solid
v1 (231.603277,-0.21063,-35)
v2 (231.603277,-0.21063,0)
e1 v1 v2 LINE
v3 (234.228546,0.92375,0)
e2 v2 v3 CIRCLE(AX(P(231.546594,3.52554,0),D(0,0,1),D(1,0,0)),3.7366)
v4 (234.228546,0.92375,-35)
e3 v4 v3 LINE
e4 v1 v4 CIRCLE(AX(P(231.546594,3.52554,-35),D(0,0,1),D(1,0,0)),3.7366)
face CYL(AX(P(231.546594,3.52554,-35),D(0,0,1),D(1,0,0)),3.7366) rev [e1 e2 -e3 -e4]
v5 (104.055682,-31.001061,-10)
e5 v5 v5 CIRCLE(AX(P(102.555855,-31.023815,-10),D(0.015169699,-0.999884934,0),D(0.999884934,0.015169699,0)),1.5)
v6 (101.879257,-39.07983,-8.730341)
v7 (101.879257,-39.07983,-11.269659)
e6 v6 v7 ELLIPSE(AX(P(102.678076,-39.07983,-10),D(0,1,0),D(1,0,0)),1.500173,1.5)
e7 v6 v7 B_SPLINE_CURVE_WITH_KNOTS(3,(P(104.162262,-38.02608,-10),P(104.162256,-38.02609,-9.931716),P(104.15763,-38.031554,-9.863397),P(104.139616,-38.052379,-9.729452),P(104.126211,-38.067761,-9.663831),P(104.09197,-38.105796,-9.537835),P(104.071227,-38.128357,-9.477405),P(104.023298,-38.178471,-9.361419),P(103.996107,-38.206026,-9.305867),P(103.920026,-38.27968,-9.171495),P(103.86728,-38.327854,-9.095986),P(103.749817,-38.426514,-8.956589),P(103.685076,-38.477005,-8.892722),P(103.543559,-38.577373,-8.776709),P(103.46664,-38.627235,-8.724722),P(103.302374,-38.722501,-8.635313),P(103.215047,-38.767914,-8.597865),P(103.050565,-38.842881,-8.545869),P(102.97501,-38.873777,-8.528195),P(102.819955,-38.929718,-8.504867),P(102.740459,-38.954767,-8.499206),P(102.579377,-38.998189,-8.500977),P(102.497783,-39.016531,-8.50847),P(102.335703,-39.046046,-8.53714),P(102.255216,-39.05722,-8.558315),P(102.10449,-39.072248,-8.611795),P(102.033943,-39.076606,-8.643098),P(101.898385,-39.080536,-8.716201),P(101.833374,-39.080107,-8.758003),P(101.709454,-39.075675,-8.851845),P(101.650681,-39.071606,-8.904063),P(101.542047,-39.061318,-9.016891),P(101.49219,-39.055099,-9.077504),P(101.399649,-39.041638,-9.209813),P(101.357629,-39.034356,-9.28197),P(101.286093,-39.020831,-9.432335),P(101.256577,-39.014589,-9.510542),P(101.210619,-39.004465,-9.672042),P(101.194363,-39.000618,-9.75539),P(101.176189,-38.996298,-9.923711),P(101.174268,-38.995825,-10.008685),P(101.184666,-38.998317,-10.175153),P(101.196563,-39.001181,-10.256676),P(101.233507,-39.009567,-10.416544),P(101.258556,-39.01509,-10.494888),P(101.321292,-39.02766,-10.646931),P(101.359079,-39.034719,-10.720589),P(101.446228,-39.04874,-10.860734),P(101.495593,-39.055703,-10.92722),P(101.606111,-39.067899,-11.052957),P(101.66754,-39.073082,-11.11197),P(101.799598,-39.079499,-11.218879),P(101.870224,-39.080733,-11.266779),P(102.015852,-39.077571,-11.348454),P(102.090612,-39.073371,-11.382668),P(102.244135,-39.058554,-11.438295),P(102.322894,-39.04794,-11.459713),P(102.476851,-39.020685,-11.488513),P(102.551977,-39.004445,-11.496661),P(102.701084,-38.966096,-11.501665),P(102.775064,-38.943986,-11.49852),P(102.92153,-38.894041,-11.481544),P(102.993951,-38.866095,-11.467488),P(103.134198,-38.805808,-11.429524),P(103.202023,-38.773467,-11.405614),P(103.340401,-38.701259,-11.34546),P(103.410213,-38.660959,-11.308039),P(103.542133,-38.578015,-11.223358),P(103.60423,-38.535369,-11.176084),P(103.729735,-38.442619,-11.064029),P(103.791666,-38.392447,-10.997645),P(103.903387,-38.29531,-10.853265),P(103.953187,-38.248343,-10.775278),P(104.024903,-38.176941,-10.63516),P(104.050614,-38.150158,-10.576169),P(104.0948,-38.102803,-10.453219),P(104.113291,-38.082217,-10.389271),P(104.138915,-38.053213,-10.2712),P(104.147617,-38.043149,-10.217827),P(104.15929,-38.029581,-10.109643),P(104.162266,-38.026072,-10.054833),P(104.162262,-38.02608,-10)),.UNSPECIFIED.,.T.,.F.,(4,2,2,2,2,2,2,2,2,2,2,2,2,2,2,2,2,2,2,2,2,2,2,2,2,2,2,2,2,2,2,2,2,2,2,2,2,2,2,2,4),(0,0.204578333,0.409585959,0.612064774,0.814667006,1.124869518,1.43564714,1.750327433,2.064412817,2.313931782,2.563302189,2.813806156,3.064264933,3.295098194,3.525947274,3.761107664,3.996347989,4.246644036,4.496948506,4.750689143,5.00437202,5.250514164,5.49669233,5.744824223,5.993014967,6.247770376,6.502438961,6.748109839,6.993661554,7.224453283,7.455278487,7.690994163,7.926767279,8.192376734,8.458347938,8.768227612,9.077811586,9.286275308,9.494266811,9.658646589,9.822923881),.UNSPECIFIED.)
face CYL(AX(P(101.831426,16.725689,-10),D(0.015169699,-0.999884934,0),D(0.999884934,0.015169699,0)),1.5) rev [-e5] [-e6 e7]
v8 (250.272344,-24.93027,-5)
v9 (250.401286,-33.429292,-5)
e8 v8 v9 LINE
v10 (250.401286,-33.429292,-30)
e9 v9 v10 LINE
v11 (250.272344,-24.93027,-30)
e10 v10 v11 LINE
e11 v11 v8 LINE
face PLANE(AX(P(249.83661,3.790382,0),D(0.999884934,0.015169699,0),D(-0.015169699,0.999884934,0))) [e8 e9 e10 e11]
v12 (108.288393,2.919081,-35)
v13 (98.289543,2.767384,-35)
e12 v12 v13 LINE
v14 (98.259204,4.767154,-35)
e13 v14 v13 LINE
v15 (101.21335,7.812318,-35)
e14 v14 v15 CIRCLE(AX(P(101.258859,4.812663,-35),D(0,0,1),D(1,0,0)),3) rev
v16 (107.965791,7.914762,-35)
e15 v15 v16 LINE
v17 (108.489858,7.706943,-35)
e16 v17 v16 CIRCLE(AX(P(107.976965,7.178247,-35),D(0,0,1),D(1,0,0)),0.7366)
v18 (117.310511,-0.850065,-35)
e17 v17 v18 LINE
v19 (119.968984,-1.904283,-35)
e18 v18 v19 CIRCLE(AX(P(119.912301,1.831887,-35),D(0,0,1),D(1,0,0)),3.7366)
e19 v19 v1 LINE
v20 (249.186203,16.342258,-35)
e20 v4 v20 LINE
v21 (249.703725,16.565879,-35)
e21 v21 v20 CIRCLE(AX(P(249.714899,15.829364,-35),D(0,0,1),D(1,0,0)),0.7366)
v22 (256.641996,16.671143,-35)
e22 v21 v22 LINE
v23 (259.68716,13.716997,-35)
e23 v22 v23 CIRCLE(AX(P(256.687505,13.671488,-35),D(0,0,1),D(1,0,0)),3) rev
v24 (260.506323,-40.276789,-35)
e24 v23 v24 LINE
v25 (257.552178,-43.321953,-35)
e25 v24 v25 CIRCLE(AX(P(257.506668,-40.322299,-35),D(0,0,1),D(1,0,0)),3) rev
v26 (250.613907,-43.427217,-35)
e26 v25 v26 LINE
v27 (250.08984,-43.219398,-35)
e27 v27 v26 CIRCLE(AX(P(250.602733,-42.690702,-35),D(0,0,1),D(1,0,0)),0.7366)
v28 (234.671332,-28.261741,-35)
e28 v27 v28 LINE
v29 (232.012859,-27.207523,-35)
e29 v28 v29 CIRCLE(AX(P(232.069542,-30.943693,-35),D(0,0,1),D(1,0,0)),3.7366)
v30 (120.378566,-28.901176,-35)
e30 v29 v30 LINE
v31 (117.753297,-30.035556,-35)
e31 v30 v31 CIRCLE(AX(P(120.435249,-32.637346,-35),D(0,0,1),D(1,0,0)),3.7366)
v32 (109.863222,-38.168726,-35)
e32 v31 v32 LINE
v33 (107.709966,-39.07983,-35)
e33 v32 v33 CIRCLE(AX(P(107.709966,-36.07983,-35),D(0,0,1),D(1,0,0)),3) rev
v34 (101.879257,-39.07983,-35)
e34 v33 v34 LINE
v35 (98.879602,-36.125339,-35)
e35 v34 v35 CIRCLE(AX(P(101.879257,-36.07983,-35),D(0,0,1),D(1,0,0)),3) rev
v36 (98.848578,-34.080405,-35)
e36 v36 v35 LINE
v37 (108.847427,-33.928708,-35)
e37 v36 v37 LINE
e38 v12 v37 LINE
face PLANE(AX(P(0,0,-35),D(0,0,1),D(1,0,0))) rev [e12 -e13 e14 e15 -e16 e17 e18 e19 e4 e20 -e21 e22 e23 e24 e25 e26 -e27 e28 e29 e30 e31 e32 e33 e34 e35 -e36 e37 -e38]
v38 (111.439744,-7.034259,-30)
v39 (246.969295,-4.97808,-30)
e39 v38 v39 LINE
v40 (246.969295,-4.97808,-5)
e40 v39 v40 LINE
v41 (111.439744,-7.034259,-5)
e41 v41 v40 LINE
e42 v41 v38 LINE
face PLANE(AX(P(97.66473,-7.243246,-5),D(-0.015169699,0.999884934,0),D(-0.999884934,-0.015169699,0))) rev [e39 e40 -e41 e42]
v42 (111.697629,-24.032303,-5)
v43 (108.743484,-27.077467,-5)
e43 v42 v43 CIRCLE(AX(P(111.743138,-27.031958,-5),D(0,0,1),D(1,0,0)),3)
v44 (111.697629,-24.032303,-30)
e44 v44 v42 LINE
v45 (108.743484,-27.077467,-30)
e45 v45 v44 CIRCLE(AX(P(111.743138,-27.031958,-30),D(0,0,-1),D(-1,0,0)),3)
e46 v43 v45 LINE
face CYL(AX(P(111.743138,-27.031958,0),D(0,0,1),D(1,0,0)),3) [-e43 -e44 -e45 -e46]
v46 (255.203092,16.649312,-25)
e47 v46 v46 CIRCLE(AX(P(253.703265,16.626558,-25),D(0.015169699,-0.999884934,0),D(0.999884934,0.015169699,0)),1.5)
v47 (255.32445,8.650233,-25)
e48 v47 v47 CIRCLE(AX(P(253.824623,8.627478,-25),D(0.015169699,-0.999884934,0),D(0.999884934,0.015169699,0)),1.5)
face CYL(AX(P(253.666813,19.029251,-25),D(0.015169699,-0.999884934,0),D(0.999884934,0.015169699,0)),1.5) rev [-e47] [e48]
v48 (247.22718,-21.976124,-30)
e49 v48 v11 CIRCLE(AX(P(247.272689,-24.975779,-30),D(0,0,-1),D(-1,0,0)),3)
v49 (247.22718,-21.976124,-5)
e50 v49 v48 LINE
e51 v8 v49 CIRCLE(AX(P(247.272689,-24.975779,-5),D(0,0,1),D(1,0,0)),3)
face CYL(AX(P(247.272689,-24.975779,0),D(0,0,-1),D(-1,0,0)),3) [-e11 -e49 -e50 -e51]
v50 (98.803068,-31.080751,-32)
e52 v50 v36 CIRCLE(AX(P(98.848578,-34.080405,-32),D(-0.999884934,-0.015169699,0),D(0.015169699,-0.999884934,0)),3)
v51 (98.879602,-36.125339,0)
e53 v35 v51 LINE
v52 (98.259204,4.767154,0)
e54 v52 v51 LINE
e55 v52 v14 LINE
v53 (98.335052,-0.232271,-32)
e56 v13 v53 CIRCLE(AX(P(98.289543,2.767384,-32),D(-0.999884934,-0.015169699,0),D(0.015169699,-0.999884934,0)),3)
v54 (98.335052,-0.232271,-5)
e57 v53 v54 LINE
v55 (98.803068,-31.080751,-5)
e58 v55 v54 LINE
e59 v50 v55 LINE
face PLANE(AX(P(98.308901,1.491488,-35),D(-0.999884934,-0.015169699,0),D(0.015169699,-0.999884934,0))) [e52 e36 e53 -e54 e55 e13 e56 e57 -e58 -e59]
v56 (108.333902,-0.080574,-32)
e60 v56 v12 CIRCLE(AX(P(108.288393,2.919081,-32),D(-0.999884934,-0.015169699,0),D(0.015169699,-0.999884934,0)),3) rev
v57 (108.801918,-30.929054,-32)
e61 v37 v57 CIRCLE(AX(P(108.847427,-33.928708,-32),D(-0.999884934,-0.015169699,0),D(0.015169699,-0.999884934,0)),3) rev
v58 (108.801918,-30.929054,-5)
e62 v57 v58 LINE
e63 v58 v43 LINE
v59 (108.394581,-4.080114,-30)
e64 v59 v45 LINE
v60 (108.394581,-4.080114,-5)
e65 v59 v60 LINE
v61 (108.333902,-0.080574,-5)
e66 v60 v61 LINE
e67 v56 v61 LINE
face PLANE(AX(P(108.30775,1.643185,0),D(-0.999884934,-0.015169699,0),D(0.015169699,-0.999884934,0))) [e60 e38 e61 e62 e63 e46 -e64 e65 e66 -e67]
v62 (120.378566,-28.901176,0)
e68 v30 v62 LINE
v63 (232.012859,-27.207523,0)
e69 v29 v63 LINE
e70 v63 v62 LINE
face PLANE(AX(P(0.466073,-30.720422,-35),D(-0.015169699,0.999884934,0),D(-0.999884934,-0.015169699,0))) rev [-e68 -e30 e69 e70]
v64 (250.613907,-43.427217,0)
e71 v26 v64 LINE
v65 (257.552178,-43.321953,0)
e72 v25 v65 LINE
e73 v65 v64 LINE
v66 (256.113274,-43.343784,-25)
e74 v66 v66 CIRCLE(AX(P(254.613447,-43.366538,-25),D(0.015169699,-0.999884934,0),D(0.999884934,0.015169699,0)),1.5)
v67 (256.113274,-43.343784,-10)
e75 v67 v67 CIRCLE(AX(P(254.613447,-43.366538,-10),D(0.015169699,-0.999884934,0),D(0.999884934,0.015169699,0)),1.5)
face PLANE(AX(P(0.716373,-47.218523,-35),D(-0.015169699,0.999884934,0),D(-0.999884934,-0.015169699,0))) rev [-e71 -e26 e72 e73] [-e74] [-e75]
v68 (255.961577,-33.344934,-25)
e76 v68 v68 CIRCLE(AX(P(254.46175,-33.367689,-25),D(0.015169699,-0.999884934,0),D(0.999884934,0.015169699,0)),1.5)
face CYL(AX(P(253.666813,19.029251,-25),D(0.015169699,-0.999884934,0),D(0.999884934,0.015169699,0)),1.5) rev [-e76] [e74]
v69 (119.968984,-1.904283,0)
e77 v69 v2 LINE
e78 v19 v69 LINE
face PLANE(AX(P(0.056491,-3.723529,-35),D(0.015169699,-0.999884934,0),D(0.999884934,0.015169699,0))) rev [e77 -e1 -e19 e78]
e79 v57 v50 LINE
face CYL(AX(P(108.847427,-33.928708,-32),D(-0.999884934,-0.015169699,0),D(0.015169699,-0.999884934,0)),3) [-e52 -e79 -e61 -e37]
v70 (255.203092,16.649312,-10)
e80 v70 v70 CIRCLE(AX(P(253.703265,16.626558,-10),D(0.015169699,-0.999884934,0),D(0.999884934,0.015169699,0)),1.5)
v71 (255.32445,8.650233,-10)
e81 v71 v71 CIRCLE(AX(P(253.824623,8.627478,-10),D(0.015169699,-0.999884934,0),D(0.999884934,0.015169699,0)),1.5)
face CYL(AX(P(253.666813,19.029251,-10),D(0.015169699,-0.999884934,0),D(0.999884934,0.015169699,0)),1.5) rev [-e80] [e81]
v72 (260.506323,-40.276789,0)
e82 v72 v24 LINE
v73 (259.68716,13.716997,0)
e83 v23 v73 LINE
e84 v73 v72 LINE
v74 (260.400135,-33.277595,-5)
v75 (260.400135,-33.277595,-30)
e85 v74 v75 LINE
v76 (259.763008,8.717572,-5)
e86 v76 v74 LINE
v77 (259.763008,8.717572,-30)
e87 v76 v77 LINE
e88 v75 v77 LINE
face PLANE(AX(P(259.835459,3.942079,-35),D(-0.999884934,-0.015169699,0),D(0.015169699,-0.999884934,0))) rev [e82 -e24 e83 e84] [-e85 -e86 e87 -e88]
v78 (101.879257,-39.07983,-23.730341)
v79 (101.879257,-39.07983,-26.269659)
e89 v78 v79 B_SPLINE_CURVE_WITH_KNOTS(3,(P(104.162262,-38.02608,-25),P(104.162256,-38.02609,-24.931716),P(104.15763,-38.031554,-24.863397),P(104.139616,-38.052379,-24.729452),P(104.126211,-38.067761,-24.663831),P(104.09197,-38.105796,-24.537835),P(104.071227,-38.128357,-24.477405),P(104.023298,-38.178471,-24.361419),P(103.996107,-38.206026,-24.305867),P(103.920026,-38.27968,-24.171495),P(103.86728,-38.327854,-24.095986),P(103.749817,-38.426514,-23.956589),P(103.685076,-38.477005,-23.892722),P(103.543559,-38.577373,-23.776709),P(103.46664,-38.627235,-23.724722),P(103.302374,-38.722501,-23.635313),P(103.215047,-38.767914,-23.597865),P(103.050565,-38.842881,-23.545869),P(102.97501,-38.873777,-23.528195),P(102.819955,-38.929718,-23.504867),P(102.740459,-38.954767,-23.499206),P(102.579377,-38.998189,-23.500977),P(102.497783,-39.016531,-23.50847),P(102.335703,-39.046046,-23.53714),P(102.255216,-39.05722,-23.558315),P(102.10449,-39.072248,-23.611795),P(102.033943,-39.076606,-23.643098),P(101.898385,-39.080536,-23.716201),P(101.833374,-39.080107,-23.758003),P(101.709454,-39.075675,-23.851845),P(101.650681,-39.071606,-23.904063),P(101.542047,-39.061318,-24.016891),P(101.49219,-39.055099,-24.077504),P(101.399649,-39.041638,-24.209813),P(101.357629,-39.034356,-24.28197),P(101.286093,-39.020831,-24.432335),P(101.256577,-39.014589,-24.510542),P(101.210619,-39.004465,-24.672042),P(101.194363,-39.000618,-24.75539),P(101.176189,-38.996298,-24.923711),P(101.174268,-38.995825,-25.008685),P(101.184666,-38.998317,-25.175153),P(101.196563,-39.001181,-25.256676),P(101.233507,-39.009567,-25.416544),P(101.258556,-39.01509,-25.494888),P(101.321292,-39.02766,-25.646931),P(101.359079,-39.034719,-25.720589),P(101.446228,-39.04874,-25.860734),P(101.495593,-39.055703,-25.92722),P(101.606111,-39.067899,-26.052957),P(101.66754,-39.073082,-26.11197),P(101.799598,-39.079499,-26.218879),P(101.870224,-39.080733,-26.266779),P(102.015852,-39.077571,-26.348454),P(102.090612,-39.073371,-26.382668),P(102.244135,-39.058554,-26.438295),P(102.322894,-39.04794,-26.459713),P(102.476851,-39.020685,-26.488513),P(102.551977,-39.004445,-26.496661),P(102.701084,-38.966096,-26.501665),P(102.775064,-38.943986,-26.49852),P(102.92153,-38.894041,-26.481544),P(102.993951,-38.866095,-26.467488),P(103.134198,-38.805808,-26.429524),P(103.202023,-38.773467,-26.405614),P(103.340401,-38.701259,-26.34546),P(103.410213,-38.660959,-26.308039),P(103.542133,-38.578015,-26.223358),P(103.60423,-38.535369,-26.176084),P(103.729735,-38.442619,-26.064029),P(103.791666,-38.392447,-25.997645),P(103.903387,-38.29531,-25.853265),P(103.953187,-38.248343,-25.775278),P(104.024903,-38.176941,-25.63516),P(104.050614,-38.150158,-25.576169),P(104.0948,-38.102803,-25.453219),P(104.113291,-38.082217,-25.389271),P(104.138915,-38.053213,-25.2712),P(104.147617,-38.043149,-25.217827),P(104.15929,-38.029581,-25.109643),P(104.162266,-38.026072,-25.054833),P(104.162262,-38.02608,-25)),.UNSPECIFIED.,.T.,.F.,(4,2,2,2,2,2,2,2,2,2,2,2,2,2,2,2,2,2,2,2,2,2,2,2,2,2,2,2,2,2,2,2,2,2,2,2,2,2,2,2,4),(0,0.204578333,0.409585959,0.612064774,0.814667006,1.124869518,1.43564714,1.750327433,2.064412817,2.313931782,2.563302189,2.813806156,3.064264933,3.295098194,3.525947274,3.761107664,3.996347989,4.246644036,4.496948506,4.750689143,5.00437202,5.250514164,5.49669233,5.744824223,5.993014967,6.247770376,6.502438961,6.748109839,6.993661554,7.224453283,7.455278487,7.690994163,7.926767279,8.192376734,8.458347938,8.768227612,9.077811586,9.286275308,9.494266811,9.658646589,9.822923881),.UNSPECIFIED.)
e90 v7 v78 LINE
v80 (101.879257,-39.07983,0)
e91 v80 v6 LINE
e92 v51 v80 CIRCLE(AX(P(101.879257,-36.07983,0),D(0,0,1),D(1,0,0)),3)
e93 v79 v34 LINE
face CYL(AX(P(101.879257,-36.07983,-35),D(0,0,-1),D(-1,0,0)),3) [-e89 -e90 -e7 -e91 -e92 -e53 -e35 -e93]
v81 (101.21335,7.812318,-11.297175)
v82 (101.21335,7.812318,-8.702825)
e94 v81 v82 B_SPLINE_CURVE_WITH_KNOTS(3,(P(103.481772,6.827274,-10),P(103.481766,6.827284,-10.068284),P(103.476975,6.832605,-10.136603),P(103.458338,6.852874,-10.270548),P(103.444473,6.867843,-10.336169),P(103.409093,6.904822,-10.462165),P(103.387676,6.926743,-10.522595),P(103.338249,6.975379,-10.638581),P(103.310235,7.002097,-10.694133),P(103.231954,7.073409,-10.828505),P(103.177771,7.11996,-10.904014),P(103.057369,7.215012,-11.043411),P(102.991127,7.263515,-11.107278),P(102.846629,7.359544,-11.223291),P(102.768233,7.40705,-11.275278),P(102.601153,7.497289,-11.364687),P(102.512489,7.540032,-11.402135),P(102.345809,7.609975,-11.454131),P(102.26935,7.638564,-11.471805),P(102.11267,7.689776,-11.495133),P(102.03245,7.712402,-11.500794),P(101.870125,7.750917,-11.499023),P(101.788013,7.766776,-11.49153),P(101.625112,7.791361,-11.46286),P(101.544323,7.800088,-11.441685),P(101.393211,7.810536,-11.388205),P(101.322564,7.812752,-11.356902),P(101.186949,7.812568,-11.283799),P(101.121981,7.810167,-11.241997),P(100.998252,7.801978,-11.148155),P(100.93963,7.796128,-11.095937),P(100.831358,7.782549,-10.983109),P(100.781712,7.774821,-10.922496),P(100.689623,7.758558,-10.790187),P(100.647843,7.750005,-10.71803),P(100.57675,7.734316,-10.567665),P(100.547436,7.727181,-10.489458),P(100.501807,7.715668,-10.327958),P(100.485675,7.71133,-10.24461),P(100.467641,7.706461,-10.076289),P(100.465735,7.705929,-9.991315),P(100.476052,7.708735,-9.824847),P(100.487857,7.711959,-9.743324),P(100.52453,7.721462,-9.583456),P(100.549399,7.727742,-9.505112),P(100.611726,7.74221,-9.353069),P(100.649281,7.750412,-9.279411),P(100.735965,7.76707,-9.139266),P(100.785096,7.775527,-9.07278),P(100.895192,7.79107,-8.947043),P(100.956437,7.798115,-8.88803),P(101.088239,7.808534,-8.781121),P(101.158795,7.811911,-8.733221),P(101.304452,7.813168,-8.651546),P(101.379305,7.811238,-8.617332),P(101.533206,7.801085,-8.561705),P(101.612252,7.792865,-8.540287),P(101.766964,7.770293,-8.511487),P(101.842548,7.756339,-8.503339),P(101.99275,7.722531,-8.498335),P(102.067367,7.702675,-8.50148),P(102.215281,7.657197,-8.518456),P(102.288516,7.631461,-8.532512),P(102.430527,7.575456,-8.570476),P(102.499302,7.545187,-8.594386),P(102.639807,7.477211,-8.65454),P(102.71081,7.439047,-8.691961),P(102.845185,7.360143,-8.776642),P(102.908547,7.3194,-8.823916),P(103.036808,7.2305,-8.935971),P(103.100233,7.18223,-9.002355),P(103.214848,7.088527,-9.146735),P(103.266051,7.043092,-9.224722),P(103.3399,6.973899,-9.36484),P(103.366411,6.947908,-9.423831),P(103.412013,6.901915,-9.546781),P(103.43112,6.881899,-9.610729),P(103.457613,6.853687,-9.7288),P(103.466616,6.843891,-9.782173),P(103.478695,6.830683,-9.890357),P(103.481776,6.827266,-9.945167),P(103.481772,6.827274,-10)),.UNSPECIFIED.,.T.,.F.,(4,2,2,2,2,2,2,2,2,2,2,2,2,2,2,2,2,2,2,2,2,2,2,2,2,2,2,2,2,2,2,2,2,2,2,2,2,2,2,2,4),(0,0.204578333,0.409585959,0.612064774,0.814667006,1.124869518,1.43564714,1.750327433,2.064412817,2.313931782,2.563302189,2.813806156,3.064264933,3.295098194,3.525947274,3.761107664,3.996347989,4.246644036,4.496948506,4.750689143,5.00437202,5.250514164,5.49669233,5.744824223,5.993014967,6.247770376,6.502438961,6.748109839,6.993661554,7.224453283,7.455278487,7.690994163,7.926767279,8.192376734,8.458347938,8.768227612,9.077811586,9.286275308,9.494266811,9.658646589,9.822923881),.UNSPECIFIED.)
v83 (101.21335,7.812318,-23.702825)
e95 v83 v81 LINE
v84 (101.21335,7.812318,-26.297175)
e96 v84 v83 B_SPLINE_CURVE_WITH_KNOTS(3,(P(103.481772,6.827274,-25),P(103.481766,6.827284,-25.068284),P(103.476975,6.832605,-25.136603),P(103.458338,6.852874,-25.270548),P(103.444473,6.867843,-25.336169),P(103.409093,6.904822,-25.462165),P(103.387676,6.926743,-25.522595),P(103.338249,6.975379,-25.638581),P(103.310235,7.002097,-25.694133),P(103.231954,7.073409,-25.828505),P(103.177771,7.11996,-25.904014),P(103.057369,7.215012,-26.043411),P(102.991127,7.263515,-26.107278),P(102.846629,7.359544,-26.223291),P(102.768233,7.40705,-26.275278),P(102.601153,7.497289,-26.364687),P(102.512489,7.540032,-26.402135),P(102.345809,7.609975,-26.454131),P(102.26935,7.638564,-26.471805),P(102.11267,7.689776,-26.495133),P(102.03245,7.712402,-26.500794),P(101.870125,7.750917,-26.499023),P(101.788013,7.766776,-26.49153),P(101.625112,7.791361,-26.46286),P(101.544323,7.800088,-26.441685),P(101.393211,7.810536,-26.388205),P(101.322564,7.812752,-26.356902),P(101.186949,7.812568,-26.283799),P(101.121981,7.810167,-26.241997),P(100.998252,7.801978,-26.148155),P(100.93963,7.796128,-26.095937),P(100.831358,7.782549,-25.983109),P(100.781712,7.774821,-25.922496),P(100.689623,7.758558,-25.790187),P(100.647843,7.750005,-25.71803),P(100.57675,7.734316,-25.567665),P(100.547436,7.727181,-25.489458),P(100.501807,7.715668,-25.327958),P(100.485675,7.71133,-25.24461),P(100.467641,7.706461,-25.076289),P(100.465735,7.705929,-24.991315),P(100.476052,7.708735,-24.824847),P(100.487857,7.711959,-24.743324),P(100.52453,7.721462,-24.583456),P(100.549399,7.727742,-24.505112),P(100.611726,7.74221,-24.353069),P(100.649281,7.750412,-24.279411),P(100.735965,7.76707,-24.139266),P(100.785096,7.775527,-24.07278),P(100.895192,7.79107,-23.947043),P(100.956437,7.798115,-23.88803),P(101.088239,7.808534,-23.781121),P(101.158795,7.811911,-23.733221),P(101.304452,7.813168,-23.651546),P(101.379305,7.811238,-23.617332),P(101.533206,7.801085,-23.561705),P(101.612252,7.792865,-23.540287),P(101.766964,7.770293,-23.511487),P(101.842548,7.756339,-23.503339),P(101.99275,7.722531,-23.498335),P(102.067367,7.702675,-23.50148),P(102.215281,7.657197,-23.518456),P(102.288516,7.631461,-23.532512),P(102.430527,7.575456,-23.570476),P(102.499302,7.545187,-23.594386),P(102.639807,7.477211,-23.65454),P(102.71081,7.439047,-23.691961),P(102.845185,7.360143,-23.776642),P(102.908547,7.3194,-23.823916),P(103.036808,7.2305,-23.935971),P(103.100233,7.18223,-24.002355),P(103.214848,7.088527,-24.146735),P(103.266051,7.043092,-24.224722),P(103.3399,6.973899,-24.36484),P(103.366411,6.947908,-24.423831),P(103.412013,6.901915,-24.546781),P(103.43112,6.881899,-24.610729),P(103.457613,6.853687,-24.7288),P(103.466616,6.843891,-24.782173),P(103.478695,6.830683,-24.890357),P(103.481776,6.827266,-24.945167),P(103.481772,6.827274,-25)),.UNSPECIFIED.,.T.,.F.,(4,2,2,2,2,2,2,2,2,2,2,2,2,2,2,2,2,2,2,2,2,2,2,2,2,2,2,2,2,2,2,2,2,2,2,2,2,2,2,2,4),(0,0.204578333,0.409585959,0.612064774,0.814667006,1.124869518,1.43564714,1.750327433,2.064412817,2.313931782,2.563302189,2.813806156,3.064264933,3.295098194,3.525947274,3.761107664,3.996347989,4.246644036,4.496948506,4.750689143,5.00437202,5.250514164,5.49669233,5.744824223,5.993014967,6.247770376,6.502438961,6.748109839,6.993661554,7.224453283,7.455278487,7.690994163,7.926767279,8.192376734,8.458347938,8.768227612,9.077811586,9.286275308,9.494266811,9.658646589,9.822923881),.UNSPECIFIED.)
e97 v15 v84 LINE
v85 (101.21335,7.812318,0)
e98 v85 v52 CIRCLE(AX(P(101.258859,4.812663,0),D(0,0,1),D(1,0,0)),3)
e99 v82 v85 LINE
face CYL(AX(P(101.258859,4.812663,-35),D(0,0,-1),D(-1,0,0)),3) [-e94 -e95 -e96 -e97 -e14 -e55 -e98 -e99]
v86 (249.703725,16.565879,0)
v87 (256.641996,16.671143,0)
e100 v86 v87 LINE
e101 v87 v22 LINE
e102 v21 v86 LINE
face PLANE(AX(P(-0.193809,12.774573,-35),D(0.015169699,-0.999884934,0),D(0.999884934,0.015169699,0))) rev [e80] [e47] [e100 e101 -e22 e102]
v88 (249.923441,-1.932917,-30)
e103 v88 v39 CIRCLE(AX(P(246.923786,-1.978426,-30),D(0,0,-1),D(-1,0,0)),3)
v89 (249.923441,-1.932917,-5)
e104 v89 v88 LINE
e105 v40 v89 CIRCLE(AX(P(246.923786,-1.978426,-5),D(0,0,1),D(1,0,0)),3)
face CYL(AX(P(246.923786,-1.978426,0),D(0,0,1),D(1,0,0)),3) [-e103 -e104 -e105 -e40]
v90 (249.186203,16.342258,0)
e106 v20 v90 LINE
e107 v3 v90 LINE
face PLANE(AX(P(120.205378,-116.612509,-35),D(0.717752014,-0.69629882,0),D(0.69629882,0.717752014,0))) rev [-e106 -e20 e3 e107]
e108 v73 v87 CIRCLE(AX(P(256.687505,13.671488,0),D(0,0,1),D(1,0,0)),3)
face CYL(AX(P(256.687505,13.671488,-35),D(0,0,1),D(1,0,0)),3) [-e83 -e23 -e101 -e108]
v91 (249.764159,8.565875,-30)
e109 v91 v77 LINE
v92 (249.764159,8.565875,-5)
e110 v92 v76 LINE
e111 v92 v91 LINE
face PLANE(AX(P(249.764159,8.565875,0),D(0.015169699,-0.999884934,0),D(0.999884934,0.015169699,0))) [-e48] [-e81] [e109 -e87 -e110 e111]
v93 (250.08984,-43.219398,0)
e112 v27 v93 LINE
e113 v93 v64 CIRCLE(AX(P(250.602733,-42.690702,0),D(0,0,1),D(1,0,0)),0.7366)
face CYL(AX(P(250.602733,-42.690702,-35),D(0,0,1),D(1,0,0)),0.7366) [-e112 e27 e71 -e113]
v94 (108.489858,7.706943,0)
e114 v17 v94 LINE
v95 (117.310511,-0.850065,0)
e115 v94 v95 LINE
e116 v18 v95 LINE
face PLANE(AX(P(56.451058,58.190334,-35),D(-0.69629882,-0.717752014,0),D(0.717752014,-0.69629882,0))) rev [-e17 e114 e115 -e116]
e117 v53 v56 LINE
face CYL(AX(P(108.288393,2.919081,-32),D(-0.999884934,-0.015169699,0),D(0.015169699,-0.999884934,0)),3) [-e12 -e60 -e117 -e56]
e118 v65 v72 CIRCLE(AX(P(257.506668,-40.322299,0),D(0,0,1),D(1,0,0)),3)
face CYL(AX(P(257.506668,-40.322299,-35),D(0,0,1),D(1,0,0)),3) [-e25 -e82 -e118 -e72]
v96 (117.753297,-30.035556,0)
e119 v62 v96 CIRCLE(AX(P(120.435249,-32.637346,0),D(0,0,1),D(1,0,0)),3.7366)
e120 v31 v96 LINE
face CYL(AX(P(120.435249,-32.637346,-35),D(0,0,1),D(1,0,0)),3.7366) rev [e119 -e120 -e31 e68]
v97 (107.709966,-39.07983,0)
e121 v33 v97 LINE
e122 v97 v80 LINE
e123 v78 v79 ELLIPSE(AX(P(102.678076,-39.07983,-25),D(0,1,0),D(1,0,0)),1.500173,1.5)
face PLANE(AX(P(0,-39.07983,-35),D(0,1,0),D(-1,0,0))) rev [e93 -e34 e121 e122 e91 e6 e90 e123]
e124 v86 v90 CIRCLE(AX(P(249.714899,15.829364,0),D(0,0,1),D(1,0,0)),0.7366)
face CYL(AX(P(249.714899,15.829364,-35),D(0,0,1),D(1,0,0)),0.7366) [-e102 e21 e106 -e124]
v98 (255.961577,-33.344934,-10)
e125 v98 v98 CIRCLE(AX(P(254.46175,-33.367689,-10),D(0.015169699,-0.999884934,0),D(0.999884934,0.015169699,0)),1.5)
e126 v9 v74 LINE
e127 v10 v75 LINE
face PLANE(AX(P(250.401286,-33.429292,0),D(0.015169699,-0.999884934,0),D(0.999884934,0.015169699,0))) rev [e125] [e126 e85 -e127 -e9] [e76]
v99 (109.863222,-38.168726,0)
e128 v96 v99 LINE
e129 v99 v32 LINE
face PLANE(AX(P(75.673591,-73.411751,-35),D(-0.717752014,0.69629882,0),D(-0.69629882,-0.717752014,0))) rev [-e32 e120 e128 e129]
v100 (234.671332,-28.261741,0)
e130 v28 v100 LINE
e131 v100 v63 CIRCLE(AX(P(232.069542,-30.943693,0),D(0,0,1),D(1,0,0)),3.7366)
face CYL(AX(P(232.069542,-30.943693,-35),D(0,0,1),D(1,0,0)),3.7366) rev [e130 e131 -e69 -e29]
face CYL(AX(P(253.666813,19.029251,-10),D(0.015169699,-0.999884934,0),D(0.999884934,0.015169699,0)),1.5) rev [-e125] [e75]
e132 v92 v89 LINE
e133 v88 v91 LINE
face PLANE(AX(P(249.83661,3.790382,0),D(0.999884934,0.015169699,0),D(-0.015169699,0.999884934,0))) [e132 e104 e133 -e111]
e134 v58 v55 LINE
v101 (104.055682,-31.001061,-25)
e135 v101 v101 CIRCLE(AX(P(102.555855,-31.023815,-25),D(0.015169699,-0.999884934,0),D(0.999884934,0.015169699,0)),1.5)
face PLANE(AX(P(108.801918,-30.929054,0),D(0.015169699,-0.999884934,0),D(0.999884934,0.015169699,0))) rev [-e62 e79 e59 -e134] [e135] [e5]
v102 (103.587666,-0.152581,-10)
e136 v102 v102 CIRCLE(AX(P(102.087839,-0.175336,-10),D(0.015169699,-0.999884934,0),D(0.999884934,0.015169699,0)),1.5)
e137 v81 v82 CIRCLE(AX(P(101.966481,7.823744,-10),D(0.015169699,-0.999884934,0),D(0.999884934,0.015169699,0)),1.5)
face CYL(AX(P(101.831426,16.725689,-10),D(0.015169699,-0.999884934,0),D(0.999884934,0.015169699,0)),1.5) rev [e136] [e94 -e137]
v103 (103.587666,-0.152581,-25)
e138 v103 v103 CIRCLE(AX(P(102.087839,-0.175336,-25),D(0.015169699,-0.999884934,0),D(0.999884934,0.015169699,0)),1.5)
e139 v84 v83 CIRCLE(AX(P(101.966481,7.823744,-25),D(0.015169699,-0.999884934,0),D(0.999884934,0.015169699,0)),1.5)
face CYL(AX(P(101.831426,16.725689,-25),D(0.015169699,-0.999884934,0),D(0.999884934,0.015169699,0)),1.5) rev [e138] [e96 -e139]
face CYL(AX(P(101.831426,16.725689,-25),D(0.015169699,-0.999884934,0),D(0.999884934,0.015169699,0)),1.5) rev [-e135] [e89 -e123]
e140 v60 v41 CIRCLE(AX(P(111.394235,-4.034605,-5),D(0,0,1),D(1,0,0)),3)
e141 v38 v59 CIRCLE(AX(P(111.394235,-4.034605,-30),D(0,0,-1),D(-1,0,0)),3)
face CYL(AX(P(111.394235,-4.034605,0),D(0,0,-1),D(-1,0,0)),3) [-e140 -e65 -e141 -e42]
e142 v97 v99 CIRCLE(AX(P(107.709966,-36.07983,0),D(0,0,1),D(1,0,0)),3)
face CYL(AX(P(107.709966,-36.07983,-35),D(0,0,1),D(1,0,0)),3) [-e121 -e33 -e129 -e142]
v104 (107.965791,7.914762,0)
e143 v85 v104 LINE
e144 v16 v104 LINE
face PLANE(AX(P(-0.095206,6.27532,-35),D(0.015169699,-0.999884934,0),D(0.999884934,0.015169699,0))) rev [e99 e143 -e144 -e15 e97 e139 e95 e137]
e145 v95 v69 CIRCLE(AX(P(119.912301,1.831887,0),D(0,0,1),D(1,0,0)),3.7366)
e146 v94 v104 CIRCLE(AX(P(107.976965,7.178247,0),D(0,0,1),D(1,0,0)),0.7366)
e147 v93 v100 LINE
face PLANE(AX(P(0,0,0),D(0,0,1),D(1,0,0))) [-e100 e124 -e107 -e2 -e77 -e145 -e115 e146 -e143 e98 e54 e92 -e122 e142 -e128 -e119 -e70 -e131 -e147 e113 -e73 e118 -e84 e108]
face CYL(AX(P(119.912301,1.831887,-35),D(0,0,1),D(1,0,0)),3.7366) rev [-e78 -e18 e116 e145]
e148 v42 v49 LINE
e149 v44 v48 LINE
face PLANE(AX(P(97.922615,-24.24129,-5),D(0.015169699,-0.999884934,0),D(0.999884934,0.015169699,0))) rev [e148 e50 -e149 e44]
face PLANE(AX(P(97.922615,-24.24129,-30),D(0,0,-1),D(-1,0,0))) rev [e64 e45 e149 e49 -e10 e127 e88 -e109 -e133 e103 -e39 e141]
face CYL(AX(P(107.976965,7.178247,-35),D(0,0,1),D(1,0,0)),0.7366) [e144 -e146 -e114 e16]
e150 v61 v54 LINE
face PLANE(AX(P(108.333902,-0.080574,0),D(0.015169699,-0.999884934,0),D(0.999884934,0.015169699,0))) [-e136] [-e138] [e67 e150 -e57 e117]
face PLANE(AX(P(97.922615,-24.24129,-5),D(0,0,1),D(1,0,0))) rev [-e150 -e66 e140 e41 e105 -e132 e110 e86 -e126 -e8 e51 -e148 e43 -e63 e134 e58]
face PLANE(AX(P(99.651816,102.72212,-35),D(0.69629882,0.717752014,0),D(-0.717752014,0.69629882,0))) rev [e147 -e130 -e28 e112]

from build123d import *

# Parameters (mm, degrees)
EXTRUDE_1_DEPTH     = 35
SKETCH_2_W          = 25
SKETCH_2_H          = 17
CUT_EXTRUDE_1_DEPTH = 173.018757571
SKETCH_4_W          = 25
SKETCH_4_H          = 13.5
SKETCH_4_H_2        = 11.5
CUT_EXTRUDE_2_DEPTH = 10
SKETCH_7_W          = 25
SKETCH_7_H          = 7
SKETCH_7_H_2        = 6.852029594
CUT_EXTRUDE_5_DEPTH = 10
FILLET_1_R          = 3
SKETCH_9_R          = 1.5
CUT_EXTRUDE_6_DEPTH = 270.810917265
CUT_EXTRUDE_8_DEPTH = 10
FILLET_3_R          = 3


with BuildPart() as part:
    # 草图1 → 凸台-拉伸1 (new body)
    with BuildSketch(Plane.XY):
        with BuildLine():
            Line((107.965790756, 7.914761882), (98.213694846, 7.766808503))
            Line((98.213694846, 7.766808503), (98.92442601, -39.079829993))
            Line((98.92442601, -39.079829993), (108.678766587, -39.079829993))
            ThreePointArc((108.678766587, -39.079829993), (108.959768197, -39.019490003), (109.19628872, -38.856208462))
            Line((109.19628872, -38.856208462), (117.753296763, -30.035556214))
            ThreePointArc((117.753296763, -30.035556214), (118.95311021, -29.207267035), (120.378565842, -28.901176343))
            Line((120.378565842, -28.901176343), (232.012858889, -27.207522891))
            ThreePointArc((232.012858889, -27.207522891), (233.446944009, -27.470230219), (234.671332156, -28.261740759))
            Line((234.671332156, -28.261740759), (250.089839512, -43.21939783))
            ThreePointArc((250.089839512, -43.21939783), (250.331204472, -43.375429159), (250.613907223, -43.427216939))
            Line((250.613907223, -43.427216939), (260.551832391, -43.276444261))
            Line((260.551832391, -43.276444261), (259.64165048, 16.716651749))
            Line((259.64165048, 16.716651749), (249.703725312, 16.565879071))
            ThreePointArc((249.703725312, 16.565879071), (249.422723701, 16.505539082), (249.186203178, 16.34225754))
            Line((249.186203178, 16.34225754), (234.228546108, 0.923750185))
            ThreePointArc((234.228546108, 0.923750185), (233.028732661, 0.095461006), (231.603277029, -0.210629686))
            Line((231.603277029, -0.210629686), (119.968983982, -1.904283139))
            ThreePointArc((119.968983982, -1.904283139), (118.534898862, -1.64157581), (117.310510715, -0.85006527))
            Line((117.310510715, -0.85006527), (108.489858467, 7.706942773))
            ThreePointArc((108.489858467, 7.706942773), (108.248493507, 7.862974102), (107.965790756, 7.914761882))
        make_face()
    extrude(amount=-EXTRUDE_1_DEPTH)

    # 草图2 → 切除-拉伸1 (cut, through all)
    with BuildSketch(Plane(origin=(259.835459196, 3.942079181, 0), x_dir=(0, 0, -1), z_dir=(0.999884933503295, 0.01516969851748372, 0))):
        with Locations((17.5, -17.223957338)):
            Rectangle(SKETCH_2_W, SKETCH_2_H)
    extrude(amount=-CUT_EXTRUDE_1_DEPTH, mode=Mode.SUBTRACT)

    # 草图4 → 切除-拉伸2 (cut)
    with BuildSketch(Plane(origin=(259.835459196, 3.942079181, 0), x_dir=(0, 0, -1), z_dir=(0.999884933503295, 0.01516969851748372, 0))):
        with Locations((17.5, -1.973957338)):
            Rectangle(SKETCH_4_W, SKETCH_4_H)
        with Locations((17.5, -31.473957338)):
            Rectangle(SKETCH_4_W, SKETCH_4_H_2)
    extrude(amount=-CUT_EXTRUDE_2_DEPTH, mode=Mode.SUBTRACT)

    # 草图7 → 切除-拉伸5 (cut)
    with BuildSketch(Plane(origin=(98.308900521, 1.491488003, 0), x_dir=(0, 0, 1), z_dir=(-0.9998849335032951, -0.015169698517482276, 0))):
        with Locations((-17.5, -5.223957338)):
            Rectangle(SKETCH_7_W, SKETCH_7_H)
        with Locations((-17.5, -29.149972135)):
            Rectangle(SKETCH_7_W, SKETCH_7_H_2)
    extrude(amount=-CUT_EXTRUDE_5_DEPTH, mode=Mode.SUBTRACT)

    # 圆角1
    # the kernel refuses this fillet: 3 mm, written as the material it takes off along each edge
    with BuildSketch(Plane(origin=(250.226834538, -21.930615176, -30), x_dir=(0.01516969851748703, -0.9998849335032949, 0), z_dir=(0, 0, 1)), Plane(origin=(249.968949663, -4.932571306, -5), x_dir=(-0.015169698517477554, 0.999884933503295, 0), z_dir=(0, 0, -1))) as fillet_1_piece_1:
        with BuildLine():
            CenterArc((FILLET_1_R, -FILLET_1_R), FILLET_1_R, 90, 90)
            Line((0, -FILLET_1_R), (0, 0))
            Line((0, 0), (FILLET_1_R, 0))
        make_face()
    extrude(amount=25, mode=Mode.SUBTRACT)
    with BuildSketch(Plane(origin=(98.92442601, -39.079829993, 7.387077266), x_dir=(1, 0, 0), z_dir=(0, 0, -1))) as fillet_1_piece_2:
        with BuildLine():
            CenterArc((FILLET_1_R * 0.984943635496, -FILLET_1_R), FILLET_1_R, 90, 89.13080696)
            Line((-FILLET_1_R * 0.0149412980072, -FILLET_1_R * 0.984830301483), (0, 0))
            Line((0, 0), (FILLET_1_R * 0.984943635496, 0))
        make_face()
    extrude(amount=49.774154532, mode=Mode.SUBTRACT)
    with BuildSketch(Plane(origin=(108.678766587, -39.079829993, 3.735844088), x_dir=(0.7926292381316349, 0.6097039370537671, 0), z_dir=(0, 0, -1))) as fillet_1_piece_3:
        with BuildLine():
            CenterArc((1.061212336, -2.968569096), FILLET_1_R, 81.698905724, 45.86919304)
            Line((-0.767899475, -0.590681381), (-0.950810656, -0.35289261))
            Line((-0.950810656, -0.35289261), (-0.182911181, 0.237788771))
            Line((-0.182911181, 0.237788771), (-0.17928295, 0.240536117))
            ThreePointArc((-0.17928295, 0.240536117), (0.589858632, 0.435143228), (1.537650165, 0.29685691))
            Line((1.537650165, 0.29685691), (1.494337635, 0))
        make_face()
    extrude(amount=42.471688176, mode=Mode.SUBTRACT)
    with BuildSketch(Plane(origin=(260.551832391, -43.276444261, 7.5), x_dir=(-0.015169698517487012, 0.9998849335032949, 0), z_dir=(0, 0, -1)), Plane(origin=(98.213694846, 7.766808503, 7.5), x_dir=(0.015169698517482278, -0.999884933503295, 0), z_dir=(0, 0, -1))) as fillet_1_piece_4:
        with BuildLine():
            CenterArc((FILLET_1_R, -FILLET_1_R), FILLET_1_R, 90, 90)
            Line((0, -FILLET_1_R), (0, 0))
            Line((0, 0), (FILLET_1_R, 0))
        make_face()
    extrude(amount=50, mode=Mode.SUBTRACT)
    with BuildSketch(Plane(origin=(259.64165048, 16.716651749, 7.5), x_dir=(0.015169698517487083, -0.9998849335032949, 0), z_dir=(0, 0, -1))) as fillet_1_piece_5:
        with BuildLine():
            CenterArc((FILLET_1_R, FILLET_1_R), FILLET_1_R, 180, 90)
            Line((0, FILLET_1_R), (0, 0))
            Line((0, 0), (FILLET_1_R, 0))
        make_face()
    extrude(amount=50, mode=Mode.SUBTRACT)
    with BuildSketch(Plane(origin=(108.440089659, -7.079768515, -30), x_dir=(0.9998849335032949, 0.015169698517490995, 0), z_dir=(0, 0, 1)), Plane(origin=(108.697974533, -24.077812384, -5), x_dir=(0.9998849335032949, 0.015169698517490636, 0), z_dir=(0, 0, -1))) as fillet_1_piece_6:
        with BuildLine():
            CenterArc((FILLET_1_R, FILLET_1_R), FILLET_1_R, 180, 90)
            Line((0, FILLET_1_R), (0, 0))
            Line((0, 0), (FILLET_1_R, 0))
        make_face()
    extrude(amount=25, mode=Mode.SUBTRACT)

    # 草图9 → 切除-拉伸6 (cut, through all)
    with BuildSketch(Plane(origin=(0.716373196, -47.218523443, 0), x_dir=(0.999884933503295, 0.015169698517483048, 0), z_dir=(0.015169698517483048, -0.999884933503295, 0))):
        with Locations((253.92629217, -25)):
            Circle(SKETCH_9_R)
        with Locations((253.92629217, -10)):
            Circle(SKETCH_9_R)
        with Locations((102.073432063, -10)):
            Circle(SKETCH_9_R)
        with Locations((102.073432063, -25)):
            Circle(SKETCH_9_R)
    extrude(amount=-CUT_EXTRUDE_6_DEPTH, mode=Mode.SUBTRACT)

    # 草图11 → 切除-拉伸8 (cut)
    with BuildSketch(Plane(origin=(0, 0, -35), x_dir=(-1, 0, 0), z_dir=(0, 0, -1))):
        Polygon((-98.335052434, -0.232270965), (-98.803068421, -31.080750525), (-108.801917756, -30.929053539), (-108.333901769, -0.08057398), align=None)
    extrude(amount=-CUT_EXTRUDE_8_DEPTH, mode=Mode.SUBTRACT)

    # 圆角3
    fillet_3_edges = [part.edges().sort_by_distance(p)[0] for p in [
        (103.334477101, -0.156422473, -35),
        (103.802493089, -31.004902032, -35),
    ]]
    fillet(fillet_3_edges, radius=FILLET_3_R)


solid = part.part
